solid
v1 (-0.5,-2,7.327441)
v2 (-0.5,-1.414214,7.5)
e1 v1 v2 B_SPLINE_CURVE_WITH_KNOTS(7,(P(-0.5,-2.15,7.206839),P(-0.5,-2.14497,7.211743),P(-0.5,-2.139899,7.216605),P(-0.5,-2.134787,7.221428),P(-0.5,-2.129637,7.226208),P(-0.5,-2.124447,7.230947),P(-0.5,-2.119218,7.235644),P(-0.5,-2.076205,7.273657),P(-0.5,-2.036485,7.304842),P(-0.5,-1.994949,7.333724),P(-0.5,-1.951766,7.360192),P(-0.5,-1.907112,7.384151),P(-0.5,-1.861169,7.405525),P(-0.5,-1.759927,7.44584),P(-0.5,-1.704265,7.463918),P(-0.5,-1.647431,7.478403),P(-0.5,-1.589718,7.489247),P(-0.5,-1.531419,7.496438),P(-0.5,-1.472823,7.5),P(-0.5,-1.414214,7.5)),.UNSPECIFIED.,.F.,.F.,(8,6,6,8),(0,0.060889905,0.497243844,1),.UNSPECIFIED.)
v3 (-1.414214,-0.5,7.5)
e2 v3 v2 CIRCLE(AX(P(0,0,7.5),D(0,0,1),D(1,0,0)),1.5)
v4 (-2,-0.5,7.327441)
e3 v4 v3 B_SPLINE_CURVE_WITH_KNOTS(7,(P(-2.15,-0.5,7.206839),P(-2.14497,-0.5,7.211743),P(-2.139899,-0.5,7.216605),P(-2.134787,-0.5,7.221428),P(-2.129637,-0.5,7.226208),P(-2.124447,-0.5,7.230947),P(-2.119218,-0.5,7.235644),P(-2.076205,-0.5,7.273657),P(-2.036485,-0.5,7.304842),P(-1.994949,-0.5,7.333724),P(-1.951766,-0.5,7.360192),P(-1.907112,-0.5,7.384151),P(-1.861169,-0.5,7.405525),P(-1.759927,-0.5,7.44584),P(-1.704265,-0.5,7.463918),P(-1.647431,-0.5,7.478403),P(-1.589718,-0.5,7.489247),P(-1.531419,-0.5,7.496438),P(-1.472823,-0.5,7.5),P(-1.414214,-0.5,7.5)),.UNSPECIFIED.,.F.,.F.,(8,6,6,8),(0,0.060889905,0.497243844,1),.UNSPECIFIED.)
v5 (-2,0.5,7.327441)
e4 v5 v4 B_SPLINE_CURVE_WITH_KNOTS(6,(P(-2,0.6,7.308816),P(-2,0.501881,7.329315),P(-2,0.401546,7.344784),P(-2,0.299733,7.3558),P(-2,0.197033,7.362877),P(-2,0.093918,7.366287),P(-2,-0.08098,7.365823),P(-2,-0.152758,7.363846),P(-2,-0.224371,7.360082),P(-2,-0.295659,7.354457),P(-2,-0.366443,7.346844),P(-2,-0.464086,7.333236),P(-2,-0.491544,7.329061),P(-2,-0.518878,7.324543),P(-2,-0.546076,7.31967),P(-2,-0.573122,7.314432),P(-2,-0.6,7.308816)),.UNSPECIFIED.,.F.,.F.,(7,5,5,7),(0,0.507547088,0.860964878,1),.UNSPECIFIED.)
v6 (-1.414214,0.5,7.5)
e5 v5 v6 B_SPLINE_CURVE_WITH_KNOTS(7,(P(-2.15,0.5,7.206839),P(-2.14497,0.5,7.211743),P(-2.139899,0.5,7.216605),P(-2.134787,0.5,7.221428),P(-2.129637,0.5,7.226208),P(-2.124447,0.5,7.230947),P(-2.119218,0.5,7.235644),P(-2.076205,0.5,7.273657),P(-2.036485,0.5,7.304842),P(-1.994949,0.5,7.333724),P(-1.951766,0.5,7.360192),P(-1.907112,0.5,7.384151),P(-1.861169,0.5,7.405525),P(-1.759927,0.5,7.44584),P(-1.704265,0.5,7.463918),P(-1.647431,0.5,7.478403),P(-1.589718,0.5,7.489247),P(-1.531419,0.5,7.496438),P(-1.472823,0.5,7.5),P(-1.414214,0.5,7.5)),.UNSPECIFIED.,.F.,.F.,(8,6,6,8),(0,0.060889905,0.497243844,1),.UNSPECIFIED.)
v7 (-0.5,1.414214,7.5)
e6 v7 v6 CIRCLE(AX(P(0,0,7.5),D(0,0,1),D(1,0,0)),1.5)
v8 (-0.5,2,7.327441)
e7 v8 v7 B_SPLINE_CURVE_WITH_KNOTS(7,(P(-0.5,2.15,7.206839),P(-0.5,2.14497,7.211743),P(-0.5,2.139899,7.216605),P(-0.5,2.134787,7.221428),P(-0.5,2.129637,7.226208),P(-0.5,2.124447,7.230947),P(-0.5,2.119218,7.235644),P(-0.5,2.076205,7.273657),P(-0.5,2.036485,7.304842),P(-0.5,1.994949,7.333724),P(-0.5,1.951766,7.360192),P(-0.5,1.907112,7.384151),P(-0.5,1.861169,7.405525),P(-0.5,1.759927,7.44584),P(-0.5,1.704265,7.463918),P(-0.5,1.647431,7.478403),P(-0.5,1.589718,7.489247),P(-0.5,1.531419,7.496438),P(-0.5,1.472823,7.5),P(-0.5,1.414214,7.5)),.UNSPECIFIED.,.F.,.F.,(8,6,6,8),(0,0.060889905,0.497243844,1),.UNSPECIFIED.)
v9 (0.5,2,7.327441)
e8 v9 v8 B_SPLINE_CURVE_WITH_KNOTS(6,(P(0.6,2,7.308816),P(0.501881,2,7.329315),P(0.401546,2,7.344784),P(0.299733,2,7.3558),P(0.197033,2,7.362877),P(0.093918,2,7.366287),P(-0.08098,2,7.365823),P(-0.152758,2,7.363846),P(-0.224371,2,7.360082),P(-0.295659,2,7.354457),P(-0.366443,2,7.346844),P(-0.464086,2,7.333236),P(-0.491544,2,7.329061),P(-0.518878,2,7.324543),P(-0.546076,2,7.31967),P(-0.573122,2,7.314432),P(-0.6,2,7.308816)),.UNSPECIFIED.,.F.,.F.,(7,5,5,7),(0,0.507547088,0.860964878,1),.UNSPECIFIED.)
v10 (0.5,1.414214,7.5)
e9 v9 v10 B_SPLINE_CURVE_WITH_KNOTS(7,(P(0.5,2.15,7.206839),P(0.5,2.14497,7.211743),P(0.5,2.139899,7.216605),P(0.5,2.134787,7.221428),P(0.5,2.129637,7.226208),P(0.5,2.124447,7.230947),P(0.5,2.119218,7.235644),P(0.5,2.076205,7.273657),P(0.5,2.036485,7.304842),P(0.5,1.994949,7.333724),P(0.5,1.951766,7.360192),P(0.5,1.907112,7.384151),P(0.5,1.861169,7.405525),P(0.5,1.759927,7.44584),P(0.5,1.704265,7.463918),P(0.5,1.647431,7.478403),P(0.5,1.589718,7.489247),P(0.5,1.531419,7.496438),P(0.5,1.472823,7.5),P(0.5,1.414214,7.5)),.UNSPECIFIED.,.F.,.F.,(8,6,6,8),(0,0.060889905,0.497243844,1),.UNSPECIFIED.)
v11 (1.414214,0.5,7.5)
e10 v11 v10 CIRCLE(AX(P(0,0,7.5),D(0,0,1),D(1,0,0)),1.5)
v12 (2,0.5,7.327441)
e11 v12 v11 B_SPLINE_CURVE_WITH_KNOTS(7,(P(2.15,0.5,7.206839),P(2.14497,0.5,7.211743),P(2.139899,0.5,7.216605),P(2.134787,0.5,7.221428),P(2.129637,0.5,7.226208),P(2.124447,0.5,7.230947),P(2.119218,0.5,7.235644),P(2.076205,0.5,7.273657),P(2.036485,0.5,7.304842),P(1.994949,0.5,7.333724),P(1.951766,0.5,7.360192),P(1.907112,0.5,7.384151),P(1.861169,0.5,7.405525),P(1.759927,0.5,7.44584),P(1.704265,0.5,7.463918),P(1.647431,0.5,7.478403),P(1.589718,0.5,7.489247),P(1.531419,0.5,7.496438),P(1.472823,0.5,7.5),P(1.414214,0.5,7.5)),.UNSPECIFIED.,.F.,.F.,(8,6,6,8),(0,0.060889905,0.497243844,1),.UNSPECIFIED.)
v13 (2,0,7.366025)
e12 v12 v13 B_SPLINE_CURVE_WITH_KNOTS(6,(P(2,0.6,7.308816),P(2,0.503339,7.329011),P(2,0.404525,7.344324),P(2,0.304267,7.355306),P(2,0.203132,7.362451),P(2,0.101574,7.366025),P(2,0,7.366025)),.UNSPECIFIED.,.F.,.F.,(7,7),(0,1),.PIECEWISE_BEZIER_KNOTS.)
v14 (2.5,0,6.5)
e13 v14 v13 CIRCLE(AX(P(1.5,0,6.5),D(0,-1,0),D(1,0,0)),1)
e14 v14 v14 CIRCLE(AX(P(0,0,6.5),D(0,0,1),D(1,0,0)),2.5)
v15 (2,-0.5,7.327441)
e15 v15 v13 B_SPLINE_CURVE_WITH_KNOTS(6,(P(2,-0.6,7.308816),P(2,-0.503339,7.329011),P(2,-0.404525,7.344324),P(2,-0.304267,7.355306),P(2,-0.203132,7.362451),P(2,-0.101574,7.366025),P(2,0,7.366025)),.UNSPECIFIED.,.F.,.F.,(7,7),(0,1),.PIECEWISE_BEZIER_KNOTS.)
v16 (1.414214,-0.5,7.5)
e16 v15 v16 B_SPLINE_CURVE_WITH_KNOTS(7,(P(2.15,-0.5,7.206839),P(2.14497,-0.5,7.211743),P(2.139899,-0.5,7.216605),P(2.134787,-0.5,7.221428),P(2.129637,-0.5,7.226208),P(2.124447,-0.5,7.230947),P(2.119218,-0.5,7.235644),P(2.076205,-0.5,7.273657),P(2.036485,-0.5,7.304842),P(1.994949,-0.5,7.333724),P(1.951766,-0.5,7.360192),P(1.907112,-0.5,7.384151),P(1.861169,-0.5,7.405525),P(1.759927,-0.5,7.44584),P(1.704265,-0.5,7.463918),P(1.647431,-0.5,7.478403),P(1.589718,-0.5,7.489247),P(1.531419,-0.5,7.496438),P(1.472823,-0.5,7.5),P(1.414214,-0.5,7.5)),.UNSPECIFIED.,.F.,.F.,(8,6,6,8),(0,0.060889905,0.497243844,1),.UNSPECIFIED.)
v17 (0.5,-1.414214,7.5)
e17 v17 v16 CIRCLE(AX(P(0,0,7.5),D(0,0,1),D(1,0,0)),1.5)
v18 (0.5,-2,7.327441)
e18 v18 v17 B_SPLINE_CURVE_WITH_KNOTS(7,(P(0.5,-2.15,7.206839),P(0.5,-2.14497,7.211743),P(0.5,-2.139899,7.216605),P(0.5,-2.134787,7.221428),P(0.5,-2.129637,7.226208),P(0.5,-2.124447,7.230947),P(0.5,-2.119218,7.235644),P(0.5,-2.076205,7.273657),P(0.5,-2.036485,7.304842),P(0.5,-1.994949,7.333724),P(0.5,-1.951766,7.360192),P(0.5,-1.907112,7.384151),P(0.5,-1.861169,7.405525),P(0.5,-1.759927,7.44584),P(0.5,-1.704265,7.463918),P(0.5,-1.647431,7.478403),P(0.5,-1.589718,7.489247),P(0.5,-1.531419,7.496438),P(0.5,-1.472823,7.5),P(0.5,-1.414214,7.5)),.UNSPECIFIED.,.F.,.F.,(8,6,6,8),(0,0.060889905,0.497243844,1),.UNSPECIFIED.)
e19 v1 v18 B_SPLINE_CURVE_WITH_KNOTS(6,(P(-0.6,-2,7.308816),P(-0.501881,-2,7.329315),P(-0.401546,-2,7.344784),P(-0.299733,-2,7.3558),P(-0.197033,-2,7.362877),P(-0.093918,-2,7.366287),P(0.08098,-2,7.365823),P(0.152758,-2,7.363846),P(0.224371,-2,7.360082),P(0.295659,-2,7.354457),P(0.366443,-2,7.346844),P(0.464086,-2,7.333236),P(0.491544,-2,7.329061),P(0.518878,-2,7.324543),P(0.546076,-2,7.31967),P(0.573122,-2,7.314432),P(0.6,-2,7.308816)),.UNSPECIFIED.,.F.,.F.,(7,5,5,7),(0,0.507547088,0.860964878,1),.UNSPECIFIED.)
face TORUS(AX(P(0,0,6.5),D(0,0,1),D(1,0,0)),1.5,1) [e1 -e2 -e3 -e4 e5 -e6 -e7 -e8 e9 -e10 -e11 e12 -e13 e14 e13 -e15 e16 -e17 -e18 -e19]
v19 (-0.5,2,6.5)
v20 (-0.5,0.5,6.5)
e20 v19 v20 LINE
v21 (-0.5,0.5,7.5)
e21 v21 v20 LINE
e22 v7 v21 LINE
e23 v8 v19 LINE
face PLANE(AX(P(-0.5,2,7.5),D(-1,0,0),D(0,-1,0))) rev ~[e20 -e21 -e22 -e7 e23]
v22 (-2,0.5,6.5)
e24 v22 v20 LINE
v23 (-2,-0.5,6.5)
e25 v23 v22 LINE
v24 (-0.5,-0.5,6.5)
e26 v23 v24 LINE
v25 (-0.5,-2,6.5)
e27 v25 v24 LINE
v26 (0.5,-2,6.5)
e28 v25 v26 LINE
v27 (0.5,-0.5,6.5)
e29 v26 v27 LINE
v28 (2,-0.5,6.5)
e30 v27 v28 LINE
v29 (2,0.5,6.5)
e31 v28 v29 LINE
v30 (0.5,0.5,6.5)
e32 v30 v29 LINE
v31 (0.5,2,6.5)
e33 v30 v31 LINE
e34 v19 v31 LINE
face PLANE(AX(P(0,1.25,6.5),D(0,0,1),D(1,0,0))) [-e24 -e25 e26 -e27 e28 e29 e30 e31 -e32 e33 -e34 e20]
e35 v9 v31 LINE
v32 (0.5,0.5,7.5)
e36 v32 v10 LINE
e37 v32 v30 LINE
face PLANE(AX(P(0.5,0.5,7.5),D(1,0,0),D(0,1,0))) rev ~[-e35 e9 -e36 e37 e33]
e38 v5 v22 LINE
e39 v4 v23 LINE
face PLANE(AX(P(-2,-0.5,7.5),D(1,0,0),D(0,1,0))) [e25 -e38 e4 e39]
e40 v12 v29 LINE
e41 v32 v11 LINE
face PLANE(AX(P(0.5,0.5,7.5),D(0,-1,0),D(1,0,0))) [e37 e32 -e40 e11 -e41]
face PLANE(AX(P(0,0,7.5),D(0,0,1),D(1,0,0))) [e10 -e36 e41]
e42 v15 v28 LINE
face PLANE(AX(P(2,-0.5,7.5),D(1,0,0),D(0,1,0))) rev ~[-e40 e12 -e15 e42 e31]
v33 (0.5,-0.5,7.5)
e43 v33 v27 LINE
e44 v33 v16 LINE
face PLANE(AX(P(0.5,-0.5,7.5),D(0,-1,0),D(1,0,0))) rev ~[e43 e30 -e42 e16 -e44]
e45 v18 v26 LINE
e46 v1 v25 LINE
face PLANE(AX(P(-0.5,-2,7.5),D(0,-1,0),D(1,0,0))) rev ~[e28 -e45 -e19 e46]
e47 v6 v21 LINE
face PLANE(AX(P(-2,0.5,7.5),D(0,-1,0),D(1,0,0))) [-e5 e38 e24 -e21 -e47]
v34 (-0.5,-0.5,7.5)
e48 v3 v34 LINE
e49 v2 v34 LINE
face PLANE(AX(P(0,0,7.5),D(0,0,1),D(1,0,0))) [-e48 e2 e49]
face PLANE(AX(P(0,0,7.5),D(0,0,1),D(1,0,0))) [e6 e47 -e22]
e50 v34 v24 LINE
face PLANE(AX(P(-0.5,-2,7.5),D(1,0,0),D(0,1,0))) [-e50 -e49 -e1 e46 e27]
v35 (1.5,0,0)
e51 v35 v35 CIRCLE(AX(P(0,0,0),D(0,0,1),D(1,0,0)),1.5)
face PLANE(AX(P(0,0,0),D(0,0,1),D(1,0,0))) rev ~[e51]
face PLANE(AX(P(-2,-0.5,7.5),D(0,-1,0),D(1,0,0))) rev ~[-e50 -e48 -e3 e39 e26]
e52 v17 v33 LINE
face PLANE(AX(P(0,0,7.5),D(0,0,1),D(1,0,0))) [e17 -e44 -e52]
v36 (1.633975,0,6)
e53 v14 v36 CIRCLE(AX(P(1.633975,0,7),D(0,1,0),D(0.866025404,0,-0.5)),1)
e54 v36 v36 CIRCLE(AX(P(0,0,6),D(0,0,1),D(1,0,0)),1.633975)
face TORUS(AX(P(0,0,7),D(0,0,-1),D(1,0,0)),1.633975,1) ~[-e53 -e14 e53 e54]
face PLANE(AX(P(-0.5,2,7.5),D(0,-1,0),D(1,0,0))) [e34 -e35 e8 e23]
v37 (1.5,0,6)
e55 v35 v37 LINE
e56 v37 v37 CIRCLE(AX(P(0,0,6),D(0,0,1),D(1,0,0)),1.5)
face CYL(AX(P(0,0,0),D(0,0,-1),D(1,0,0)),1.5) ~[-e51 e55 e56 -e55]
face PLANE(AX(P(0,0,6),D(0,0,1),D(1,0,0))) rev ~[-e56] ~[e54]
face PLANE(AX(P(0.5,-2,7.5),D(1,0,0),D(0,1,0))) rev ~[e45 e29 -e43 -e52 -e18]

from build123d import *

# Parameters (mm, degrees)
F0_R     = 1.5
F1_DEPTH = 6
F2_R     = 2.5
F3_DEPTH = 1.5
F4_W     = 1
F4_H     = 1.5
F4_H_2   = 1
F4_W_2   = 1.5
F5_DEPTH = 1


# Not quite as in the source:
# - a fillet or chamfer that OpenCascade refuses, or shapes differently, is made with other operations: its cross-section is extruded or revolved along the edge and cut away or added


with BuildPart() as f1:
    # F0 (on Top) → F1 (new body)
    with BuildSketch(Plane.XY):
        Circle(F0_R)
    extrude(amount=F1_DEPTH)

    # F2 (on face) → F3 (join)
    with BuildSketch(Plane.XY.offset(6)):
        Circle(F2_R)
    extrude(amount=F3_DEPTH)

    # F4 (on face) → F5 (cut)
    with BuildSketch(Plane.XY.offset(7.5)):
        with Locations((0, 1.25)):
            Rectangle(F4_W, F4_H)
        Rectangle(F4_W, F4_H_2)
        with Locations((-1.25, 0)):
            Rectangle(F4_W_2, F4_H_2)
        with Locations((1.25, 0)):
            Rectangle(F4_W_2, F4_H_2)
        with Locations((0, -1.25)):
            Rectangle(F4_W, F4_H)
    extrude(amount=-F5_DEPTH, mode=Mode.SUBTRACT)

    # F6: fillet of radius 1 on 1 edges, made by hand

    # F6_s1 → F6_t2 (revolve, cut)
    with BuildSketch(Plane.XZ):
        with BuildLine():
            ThreePointArc((2.5, 6.5), (2.2071067812, 7.2071067812), (1.5, 7.5))
            Line((1.5, 7.5), (2.5, 7.5))
            Line((2.5, 7.5), (2.5, 6.5))
        make_face()
    revolve(axis=Axis((0, 0, 7.5), (0, 0, 1)), mode=Mode.SUBTRACT)

    # F7: fillet of radius 1 on 1 edges, made by hand

    # F7_s1 → F7_t2 (revolve, cut)
    with BuildSketch(Plane.XZ):
        with BuildLine():
            ThreePointArc((2.5, 6.5), (2.1339745962, 6.1339745962), (1.6339745962, 6))
            Line((1.6339745962, 6), (2.5, 6))
            Line((2.5, 6), (2.5, 6.5))
        make_face()
    revolve(axis=Axis((0, 0, 6), (0, 0, 1)), mode=Mode.SUBTRACT)


solid = f1.part
